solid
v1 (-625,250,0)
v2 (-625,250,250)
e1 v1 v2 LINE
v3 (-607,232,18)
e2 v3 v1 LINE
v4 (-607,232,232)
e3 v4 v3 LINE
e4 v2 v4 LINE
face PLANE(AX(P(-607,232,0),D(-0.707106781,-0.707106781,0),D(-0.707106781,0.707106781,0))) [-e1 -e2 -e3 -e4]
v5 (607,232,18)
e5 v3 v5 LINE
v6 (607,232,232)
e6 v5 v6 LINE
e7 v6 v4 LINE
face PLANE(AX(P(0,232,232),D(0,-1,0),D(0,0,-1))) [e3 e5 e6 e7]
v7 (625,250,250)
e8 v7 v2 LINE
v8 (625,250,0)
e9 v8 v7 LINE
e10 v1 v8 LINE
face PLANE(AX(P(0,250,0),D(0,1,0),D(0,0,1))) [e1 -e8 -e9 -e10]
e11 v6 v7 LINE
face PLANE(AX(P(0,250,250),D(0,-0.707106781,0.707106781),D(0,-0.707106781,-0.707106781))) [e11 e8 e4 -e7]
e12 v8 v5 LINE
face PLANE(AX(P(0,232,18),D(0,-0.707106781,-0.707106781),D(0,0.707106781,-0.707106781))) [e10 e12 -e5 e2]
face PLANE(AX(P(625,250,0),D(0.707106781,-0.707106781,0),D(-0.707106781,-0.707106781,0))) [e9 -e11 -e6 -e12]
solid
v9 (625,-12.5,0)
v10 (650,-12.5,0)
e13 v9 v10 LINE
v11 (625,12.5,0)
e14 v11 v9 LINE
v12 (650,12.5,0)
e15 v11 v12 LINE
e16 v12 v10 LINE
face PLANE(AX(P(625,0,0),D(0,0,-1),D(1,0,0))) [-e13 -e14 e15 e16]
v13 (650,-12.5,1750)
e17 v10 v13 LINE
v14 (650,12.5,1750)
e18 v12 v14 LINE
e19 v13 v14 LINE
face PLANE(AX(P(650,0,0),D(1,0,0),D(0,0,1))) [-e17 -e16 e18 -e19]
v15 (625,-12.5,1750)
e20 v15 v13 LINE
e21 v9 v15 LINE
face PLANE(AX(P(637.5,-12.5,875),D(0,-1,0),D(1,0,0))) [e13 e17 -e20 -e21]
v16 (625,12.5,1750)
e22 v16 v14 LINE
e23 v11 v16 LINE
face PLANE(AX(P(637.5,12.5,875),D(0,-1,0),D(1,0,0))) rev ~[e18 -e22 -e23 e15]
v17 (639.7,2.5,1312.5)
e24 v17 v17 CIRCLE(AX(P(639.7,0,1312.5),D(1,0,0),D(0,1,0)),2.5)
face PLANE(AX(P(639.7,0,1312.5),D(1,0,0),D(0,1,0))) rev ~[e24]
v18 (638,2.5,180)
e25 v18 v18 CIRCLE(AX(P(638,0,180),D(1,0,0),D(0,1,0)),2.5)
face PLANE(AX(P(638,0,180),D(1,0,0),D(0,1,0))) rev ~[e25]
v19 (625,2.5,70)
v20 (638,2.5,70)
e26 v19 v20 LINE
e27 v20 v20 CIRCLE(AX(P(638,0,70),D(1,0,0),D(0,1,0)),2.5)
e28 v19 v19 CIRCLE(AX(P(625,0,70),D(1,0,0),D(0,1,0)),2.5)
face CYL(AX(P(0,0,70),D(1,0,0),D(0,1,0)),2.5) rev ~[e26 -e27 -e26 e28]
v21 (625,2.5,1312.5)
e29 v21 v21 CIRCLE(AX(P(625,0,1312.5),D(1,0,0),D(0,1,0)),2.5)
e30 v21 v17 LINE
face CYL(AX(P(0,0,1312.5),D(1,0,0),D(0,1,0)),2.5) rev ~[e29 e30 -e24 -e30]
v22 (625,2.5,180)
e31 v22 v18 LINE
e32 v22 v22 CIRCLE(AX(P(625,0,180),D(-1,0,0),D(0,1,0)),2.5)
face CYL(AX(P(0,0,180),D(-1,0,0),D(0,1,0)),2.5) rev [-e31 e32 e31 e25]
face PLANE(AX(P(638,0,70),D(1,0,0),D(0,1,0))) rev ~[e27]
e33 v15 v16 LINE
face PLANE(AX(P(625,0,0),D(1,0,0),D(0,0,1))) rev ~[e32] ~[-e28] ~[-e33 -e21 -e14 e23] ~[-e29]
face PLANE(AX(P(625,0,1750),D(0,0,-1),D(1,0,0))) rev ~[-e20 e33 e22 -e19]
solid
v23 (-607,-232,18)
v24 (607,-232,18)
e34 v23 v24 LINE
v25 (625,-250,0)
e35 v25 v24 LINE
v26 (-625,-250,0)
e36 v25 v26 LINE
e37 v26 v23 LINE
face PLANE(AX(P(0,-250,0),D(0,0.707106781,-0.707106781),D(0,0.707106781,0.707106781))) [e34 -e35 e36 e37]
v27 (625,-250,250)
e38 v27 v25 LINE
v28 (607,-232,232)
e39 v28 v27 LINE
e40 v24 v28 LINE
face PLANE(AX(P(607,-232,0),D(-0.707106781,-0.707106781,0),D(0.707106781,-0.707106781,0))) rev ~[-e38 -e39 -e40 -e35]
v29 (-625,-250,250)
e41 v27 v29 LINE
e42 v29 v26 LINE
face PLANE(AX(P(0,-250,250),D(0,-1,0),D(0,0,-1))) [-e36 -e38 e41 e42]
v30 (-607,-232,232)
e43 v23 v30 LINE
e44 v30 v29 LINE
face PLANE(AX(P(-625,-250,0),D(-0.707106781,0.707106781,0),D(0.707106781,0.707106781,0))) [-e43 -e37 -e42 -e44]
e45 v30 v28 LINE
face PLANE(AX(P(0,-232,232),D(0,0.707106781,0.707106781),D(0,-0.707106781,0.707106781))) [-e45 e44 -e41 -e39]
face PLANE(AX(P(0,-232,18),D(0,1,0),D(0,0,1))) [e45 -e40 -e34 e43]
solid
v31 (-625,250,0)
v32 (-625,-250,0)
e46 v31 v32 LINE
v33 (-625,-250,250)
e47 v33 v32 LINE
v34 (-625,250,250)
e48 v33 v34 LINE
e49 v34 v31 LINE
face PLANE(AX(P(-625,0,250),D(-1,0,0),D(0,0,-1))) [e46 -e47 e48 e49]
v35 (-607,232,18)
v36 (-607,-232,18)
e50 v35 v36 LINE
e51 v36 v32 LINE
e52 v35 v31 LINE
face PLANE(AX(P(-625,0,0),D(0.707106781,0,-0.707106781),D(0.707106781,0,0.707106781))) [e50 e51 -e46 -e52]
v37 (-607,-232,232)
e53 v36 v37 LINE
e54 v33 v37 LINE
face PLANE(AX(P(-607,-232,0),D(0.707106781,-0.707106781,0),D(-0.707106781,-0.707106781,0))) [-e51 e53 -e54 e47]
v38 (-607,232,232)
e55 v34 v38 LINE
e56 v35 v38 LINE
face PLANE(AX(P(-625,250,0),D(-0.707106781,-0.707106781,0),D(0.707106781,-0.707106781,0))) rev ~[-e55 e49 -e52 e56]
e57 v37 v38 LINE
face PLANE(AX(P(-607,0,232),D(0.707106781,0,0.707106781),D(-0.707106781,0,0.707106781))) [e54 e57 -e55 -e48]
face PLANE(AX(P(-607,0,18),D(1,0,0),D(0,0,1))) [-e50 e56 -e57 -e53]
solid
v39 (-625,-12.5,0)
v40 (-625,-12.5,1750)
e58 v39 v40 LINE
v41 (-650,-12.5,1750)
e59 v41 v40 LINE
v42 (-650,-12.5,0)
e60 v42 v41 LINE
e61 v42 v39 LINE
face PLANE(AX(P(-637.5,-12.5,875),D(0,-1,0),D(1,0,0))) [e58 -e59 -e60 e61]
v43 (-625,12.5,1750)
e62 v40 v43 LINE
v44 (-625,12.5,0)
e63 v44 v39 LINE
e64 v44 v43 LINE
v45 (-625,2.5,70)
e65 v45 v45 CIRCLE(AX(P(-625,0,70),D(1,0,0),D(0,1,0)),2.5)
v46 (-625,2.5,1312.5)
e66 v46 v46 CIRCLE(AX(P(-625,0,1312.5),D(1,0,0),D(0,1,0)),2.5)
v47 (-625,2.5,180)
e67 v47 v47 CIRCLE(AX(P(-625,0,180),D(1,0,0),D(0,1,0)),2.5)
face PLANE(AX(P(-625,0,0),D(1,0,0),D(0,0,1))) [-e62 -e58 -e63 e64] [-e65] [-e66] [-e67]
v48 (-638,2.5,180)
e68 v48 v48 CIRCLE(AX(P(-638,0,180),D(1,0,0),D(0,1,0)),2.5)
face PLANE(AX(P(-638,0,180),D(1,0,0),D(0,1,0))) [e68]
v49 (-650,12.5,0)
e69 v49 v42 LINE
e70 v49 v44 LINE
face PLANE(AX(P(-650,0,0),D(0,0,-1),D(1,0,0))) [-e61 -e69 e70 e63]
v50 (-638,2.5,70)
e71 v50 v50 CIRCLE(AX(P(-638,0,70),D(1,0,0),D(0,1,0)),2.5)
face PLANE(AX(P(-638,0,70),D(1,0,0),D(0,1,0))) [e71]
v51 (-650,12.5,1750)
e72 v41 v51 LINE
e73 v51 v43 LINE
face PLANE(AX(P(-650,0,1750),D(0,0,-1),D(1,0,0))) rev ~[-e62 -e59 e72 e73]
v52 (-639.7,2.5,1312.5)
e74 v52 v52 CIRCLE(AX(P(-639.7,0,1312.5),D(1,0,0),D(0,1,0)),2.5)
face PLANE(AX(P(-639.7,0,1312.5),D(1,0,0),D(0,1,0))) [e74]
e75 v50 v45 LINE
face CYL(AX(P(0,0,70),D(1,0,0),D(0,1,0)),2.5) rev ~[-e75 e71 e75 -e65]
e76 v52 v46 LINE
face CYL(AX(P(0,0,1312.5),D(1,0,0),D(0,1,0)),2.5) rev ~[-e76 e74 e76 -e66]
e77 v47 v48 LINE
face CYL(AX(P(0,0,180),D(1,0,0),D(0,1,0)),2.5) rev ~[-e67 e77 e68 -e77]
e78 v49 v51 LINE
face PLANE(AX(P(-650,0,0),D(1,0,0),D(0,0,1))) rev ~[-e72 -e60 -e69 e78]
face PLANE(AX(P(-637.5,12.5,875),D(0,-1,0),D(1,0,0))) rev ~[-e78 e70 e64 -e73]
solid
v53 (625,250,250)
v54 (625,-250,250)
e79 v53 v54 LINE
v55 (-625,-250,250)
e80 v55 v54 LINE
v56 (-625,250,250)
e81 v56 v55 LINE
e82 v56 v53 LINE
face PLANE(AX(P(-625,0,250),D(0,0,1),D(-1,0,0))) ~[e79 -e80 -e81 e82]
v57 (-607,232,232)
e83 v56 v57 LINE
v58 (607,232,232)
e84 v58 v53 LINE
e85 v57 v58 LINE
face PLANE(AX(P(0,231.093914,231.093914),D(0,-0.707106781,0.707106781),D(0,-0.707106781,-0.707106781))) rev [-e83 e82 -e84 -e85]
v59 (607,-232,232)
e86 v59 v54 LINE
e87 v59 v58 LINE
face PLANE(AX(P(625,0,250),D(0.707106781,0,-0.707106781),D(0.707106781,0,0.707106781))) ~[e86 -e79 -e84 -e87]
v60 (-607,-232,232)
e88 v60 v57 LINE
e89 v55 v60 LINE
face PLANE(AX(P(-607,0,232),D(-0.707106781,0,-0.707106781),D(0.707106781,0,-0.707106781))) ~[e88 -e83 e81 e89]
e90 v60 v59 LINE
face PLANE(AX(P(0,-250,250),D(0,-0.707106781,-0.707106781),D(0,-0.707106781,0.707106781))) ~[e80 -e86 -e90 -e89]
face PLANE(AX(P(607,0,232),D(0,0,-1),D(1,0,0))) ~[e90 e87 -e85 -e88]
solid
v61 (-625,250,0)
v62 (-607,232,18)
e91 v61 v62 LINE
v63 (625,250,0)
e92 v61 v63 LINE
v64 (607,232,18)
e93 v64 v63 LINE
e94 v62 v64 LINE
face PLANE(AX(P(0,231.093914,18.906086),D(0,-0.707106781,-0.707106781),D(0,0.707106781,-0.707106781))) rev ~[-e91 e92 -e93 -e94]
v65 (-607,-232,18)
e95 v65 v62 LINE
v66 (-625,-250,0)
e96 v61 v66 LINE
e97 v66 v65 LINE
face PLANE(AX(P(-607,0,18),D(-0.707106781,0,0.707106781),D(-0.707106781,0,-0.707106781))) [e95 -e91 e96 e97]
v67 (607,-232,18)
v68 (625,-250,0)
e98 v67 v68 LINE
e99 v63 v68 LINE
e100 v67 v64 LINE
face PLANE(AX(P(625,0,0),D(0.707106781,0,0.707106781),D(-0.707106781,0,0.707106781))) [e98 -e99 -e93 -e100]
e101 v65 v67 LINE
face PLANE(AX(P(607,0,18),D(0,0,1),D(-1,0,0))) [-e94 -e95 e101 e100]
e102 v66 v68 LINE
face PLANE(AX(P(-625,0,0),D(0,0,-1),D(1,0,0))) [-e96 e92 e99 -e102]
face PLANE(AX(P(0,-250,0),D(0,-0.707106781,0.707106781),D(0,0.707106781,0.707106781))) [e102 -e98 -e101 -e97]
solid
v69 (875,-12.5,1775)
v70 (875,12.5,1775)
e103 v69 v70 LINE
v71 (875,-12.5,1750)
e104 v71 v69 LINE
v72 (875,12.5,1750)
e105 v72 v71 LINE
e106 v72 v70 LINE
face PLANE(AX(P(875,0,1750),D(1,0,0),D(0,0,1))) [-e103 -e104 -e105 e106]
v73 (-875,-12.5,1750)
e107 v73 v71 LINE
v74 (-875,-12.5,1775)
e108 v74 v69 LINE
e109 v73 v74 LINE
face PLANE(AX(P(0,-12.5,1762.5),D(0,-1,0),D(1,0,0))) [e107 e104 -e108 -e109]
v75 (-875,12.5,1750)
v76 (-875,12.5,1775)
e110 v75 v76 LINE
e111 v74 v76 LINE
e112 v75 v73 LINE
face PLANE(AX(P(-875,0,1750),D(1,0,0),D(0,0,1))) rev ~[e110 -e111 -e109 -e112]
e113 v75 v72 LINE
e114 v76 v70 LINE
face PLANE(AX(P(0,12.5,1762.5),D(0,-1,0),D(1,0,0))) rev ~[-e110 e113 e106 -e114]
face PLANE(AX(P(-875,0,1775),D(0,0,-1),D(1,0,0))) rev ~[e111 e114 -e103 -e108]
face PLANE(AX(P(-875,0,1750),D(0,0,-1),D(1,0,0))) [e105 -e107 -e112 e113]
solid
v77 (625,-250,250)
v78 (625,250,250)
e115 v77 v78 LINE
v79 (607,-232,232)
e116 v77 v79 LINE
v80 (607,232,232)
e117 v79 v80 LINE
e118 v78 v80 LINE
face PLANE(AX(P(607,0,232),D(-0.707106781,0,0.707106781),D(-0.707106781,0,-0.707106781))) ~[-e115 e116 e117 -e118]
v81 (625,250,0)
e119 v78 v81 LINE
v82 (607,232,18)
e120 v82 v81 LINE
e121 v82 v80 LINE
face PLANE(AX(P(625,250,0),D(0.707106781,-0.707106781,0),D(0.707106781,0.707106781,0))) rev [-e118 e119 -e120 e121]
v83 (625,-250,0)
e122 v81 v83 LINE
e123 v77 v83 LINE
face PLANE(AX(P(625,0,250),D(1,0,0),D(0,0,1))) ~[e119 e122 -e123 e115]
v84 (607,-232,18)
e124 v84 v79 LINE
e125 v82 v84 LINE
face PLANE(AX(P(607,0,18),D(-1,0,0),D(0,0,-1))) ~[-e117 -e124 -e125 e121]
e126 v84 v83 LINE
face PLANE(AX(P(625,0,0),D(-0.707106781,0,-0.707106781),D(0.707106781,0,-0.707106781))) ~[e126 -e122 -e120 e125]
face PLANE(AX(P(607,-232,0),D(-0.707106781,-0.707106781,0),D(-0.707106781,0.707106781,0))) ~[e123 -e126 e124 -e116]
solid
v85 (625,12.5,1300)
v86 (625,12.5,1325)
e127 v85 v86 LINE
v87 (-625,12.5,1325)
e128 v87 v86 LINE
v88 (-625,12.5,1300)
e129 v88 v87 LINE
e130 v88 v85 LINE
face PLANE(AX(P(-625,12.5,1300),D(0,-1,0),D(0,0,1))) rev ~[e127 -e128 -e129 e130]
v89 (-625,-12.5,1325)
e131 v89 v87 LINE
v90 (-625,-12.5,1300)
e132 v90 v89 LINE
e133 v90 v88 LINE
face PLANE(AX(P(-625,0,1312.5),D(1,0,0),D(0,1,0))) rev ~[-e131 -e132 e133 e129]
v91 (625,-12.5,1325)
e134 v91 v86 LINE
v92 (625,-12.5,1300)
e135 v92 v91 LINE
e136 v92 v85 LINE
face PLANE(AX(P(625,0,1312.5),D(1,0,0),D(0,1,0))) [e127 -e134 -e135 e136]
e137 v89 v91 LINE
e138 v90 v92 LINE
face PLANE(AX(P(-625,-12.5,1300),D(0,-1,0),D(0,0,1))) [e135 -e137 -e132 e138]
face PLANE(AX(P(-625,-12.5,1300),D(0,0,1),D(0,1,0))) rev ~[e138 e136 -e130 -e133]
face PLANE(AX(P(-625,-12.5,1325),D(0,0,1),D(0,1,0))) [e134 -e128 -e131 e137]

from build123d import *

# Parameters (mm, degrees)
F1_DEPTH  = 250
F3_DEPTH  = 714
F5_DEPTH  = 625
F7_DEPTH  = 608
F9_DEPTH  = 250
F11_DEPTH = 534
F15_W     = 25
F15_H     = 1750
F16_DEPTH = 12.5
F17_W     = 1750
F17_H     = 25
F18_DEPTH = 12.5
F19_W     = 25
F19_H     = 25
F20_DEPTH = 1250
F21_R     = 2.5
F22_DEPTH = 638
F23_R     = 2.5
F24_DEPTH = 639.7


with BuildPart() as f1:
    # F0 (on Front) → F1 (new body, symmetric)
    with BuildSketch(Plane.XZ):
        Polygon((-607, 18), (-625, 0), (625, 0), (607, 18), align=None)
    extrude(amount=F1_DEPTH, both=True)

    # F2 (on Right) → F3 (cut, symmetric)
    with BuildSketch(Plane.YZ):
        Polygon((-266.0376429558, 0), (-250, 0), (-231.0939141602, 18.9060858398), (-231.0939141602, 28.4129753709), (-266.0376429558, 28.4129753709), align=None)
        Polygon((231.0939141602, 18.9060858398), (250, 0), (262.9185318947, 0), (262.9185318947, 44.0045437723), (231.0939141602, 44.0045437723), align=None)
    extrude(amount=F3_DEPTH, both=True, mode=Mode.SUBTRACT)


with BuildPart() as f5:
    # F4 (on Right) → F5 (new body, symmetric)
    with BuildSketch(Plane.YZ):
        Polygon((232, 232), (232, 18), (250, 0), (250, 250), align=None)
    extrude(amount=F5_DEPTH, both=True)


with BuildPart() as f5b:
    # F4 (on Right) → F5, piece 2 (new body, symmetric)
    with BuildSketch(Plane.YZ):
        Polygon((-250, 0), (-232, 18), (-232, 232), (-250, 250), align=None)
    extrude(amount=F5_DEPTH, both=True)


with BuildPart() as f7_tool:
    # F6 (on Top) → F7 (new body, symmetric)
    with BuildSketch(Plane.XY):
        Polygon((-607, 232), (-625, 250), (-625, 212.7924200636), (-607, 212.7924200636), align=None)
        Polygon((-625, -250), (-607, -232), (-638.8453841209, -232), (-638.8453841209, -250), align=None)
        Polygon((625, 212.7924200636), (625, 250), (607, 232), (607, 212.7924200636), align=None)
        Polygon((638.8453841209, -250), (638.8453841209, -232), (607, -232), (625, -250), align=None)
    extrude(amount=F7_DEPTH, both=True)


with BuildPart() as f5_1:
    add(f5.part)

    # F7: cut by f7_tool
    add(f7_tool.part, mode=Mode.SUBTRACT)


with BuildPart() as f5b_1:
    add(f5b.part)

    # F7: cut by f7_tool
    add(f7_tool.part, mode=Mode.SUBTRACT)


with BuildPart() as f9:
    # F8 (on Front) → F9 (new body, symmetric)
    with BuildSketch(Plane.XZ):
        Polygon((-625, 250), (-625, 0), (-607, 18), (-607, 232), align=None)
    extrude(amount=F9_DEPTH, both=True)

    # F10 (on Top) → F11 (cut, symmetric)
    with BuildSketch(Plane.XY):
        Polygon((-596.8062881455, -232), (-607, -232), (-625, -250), (-625, -280.7182726889), (-596.8062881455, -280.7182726889), align=None)
        Polygon((-625, 250), (-607, 232), (-596.8062881455, 234.6027734251), (-596.8062881455, 288.4899377823), (-625, 288.4899377823), align=None)
    extrude(amount=F11_DEPTH, both=True, mode=Mode.SUBTRACT)


with BuildPart() as f12_1:
    # F12: instance of F9
    add(f9.part.mirror(Plane.YZ))


with BuildPart() as f14_1:
    # F14: instance of F1
    add(f1.part.mirror(Plane.XY.offset(125)))


with BuildPart() as f16:
    # F15 (on Front) → F16 (new body, symmetric)
    with BuildSketch(Plane.XZ):
        with Locations((637.5, 875)):
            Rectangle(F15_W, F15_H)
    extrude(amount=F16_DEPTH, both=True)


with BuildPart() as f16b:
    # F15 (on Front) → F16, piece 2 (new body, symmetric)
    with BuildSketch(Plane.XZ):
        with Locations((-637.5, 875)):
            Rectangle(F15_W, F15_H)
    extrude(amount=F16_DEPTH, both=True)


with BuildPart() as f18:
    # F17 (on Front) → F18 (new body, symmetric)
    with BuildSketch(Plane.XZ):
        with Locations((0, 1762.5)):
            Rectangle(F17_W, F17_H)
    extrude(amount=F18_DEPTH, both=True)


with BuildPart() as f20:
    # F19 (on face) → F20 (new body, through all)
    with BuildSketch(Plane.YZ.offset(-625)):
        with Locations((0, 1312.5)):
            Rectangle(F19_W, F19_H)
    extrude(amount=F20_DEPTH)


with BuildPart() as f22_tool:
    # F21 (on Right) → F22 (new body, symmetric)
    with BuildSketch(Plane.YZ):
        with Locations((0, 180)):
            Circle(F21_R)
        with Locations((0, 70)):
            Circle(F21_R)
    extrude(amount=F22_DEPTH, both=True)


with BuildPart() as f16_1:
    add(f16.part)

    # F22: cut by f22_tool
    add(f22_tool.part, mode=Mode.SUBTRACT)


with BuildPart() as f16b_1:
    add(f16b.part)

    # F22: cut by f22_tool
    add(f22_tool.part, mode=Mode.SUBTRACT)


with BuildPart() as f24_tool:
    # F23 (on Right) → F24 (new body, symmetric)
    with BuildSketch(Plane.YZ):
        with Locations((0, 1312.5)):
            Circle(F23_R)
    extrude(amount=F24_DEPTH, both=True)


with BuildPart() as f16_2:
    add(f16_1.part)

    # F24: cut by f24_tool
    add(f24_tool.part, mode=Mode.SUBTRACT)


with BuildPart() as f16b_2:
    add(f16b_1.part)

    # F24: cut by f24_tool
    add(f24_tool.part, mode=Mode.SUBTRACT)


solid = Compound([f1.part, f5_1.part, f5b_1.part, f9.part, f12_1.part, f14_1.part, f18.part, f20.part, f16_2.part, f16b_2.part])
